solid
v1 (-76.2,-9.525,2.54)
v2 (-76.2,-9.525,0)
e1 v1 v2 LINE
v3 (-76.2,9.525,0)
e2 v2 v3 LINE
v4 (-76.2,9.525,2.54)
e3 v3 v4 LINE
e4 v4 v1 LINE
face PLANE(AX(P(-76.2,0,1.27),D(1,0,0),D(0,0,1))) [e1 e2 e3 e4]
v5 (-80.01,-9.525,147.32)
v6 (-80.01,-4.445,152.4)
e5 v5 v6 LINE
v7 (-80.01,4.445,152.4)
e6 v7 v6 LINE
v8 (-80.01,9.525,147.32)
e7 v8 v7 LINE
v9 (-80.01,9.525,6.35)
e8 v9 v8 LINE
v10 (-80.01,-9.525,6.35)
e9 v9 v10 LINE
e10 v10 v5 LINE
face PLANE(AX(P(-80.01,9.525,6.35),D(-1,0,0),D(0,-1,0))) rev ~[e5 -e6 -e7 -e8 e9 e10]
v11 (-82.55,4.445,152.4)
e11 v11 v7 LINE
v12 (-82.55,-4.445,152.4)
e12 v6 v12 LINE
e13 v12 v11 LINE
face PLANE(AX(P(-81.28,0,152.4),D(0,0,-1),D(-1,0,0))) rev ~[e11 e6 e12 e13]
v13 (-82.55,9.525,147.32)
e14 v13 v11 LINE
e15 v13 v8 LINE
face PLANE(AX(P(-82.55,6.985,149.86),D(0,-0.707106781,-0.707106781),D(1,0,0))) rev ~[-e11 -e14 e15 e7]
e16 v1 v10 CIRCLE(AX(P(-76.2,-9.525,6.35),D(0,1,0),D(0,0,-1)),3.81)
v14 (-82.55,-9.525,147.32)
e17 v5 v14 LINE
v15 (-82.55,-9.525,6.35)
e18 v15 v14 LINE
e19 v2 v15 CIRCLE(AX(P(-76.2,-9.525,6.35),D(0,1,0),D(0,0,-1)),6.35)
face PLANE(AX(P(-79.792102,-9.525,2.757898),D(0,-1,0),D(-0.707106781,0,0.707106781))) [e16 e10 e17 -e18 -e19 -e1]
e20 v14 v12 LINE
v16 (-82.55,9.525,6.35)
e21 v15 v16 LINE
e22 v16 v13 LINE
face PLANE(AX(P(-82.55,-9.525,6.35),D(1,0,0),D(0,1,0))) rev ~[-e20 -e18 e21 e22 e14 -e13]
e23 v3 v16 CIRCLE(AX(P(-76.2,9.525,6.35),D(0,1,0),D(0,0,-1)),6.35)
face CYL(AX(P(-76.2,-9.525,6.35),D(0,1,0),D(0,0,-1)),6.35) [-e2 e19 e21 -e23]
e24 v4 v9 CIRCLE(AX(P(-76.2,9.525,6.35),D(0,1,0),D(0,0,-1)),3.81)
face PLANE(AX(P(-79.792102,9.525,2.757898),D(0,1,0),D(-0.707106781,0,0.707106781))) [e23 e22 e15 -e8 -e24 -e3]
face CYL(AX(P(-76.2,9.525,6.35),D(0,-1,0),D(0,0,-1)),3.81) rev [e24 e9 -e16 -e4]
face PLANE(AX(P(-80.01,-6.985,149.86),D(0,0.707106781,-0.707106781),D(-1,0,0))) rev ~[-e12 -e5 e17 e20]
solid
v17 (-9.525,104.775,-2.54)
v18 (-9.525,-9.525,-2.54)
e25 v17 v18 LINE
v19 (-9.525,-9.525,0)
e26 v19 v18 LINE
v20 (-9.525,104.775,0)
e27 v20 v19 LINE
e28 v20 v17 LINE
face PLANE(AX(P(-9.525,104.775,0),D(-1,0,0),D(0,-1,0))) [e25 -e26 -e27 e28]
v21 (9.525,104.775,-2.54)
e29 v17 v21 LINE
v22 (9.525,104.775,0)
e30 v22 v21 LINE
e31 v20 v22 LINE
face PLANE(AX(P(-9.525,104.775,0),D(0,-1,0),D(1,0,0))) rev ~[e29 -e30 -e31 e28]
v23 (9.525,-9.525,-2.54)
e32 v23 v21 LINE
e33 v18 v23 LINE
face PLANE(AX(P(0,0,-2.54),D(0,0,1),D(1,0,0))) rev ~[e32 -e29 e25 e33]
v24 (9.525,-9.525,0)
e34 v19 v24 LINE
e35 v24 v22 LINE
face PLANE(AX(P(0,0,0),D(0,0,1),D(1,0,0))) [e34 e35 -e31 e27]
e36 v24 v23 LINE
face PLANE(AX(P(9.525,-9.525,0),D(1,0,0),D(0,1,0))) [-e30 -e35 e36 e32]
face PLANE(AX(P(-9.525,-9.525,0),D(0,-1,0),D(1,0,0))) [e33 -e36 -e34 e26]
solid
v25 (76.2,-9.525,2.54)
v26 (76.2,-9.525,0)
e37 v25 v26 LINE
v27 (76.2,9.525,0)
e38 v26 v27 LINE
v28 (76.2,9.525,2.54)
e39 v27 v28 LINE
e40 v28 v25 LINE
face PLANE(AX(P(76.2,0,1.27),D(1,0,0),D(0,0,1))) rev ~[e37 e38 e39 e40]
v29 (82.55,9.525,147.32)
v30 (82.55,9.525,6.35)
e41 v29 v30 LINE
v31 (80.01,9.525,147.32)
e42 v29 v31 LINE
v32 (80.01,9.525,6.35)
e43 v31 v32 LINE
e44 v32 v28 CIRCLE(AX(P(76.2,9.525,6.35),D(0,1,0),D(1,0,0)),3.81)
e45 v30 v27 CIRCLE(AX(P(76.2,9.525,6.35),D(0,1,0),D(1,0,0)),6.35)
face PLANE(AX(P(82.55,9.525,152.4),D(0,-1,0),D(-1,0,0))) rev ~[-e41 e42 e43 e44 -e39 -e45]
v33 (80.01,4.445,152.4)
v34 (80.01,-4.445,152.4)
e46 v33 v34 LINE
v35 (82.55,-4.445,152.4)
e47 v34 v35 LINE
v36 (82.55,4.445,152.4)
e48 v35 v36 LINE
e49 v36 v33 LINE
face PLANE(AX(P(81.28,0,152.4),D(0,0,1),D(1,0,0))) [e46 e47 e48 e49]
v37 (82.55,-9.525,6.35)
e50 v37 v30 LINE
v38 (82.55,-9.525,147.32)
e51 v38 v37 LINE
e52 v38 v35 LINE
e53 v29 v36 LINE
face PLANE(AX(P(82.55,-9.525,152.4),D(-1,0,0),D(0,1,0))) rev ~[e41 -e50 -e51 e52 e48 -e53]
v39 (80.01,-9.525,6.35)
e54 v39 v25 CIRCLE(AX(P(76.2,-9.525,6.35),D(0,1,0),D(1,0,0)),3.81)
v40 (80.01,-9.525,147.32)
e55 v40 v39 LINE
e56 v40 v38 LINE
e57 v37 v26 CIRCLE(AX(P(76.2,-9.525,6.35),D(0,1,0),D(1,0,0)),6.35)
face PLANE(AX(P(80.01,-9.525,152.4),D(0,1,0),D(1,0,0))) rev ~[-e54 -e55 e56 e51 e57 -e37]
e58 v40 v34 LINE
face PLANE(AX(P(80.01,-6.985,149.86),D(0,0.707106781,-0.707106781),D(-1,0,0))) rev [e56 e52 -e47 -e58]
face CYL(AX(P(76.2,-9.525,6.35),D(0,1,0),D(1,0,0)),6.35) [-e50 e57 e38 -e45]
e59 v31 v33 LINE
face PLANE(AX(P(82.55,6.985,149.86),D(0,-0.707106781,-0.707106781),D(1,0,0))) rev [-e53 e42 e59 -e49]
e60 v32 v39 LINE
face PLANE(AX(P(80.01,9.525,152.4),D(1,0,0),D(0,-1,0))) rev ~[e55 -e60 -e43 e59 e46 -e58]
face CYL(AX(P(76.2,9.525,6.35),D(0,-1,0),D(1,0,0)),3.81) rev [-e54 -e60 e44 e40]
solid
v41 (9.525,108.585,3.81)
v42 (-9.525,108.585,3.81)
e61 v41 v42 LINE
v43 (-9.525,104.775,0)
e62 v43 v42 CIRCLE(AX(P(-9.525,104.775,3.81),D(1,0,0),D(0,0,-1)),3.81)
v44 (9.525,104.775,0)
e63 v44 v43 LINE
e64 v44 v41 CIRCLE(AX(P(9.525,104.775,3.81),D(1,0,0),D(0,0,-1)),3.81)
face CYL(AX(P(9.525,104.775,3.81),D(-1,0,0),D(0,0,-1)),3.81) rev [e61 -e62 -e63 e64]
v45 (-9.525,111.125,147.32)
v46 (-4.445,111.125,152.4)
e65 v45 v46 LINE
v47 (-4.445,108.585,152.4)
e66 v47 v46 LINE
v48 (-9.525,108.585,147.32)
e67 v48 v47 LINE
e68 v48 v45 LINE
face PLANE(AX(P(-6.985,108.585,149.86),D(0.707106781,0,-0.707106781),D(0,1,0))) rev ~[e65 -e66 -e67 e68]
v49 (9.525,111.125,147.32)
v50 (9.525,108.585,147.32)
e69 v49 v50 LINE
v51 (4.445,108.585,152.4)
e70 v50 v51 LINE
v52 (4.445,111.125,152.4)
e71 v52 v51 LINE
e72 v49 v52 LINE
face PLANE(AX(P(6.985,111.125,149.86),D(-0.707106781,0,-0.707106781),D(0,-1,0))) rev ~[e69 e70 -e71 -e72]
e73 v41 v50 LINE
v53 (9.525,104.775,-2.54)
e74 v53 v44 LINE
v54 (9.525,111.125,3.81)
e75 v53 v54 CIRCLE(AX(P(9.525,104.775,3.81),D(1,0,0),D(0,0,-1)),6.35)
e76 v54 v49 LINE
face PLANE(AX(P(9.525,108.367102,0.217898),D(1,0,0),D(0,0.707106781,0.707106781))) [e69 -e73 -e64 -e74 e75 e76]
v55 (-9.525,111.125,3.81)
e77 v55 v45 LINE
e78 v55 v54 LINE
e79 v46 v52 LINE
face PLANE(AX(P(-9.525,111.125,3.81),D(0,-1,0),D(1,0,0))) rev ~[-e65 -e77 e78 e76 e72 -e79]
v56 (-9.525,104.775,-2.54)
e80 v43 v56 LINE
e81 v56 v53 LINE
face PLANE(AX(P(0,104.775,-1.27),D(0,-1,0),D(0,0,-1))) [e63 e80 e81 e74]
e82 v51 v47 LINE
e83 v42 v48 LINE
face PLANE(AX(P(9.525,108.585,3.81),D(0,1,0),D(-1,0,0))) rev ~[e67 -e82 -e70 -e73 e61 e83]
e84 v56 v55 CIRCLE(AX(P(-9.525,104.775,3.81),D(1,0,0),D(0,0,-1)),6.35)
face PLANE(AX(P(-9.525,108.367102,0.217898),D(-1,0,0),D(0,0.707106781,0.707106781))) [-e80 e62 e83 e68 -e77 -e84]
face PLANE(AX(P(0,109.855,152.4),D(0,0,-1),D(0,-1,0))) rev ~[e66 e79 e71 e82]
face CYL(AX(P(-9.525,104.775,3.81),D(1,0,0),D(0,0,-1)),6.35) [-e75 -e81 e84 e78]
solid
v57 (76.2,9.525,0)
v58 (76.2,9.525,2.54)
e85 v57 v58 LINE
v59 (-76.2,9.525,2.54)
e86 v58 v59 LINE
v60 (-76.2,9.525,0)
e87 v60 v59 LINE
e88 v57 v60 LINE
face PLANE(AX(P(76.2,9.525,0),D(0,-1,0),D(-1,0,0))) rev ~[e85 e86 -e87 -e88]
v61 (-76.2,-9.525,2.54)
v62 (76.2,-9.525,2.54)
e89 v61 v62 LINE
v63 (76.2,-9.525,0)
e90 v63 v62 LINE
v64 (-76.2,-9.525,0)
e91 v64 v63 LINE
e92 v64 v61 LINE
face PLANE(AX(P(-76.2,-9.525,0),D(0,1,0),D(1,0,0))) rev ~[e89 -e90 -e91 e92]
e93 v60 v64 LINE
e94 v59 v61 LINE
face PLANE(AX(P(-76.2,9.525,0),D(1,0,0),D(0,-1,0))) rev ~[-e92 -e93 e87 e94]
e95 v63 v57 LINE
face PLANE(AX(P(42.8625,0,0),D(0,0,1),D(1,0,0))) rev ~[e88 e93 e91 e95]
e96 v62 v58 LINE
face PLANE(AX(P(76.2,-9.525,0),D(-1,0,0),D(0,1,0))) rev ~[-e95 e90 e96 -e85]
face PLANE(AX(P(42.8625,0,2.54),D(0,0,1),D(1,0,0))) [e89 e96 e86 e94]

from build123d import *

# Parameters (mm, degrees)
F0_W       = 66.675
F0_H       = 19.05
F8_DEPTH   = 2.54
F0_W_2     = 19.05
F0_H_2     = 95.25
F13_DEPTH  = 2.54
F14_SIZE   = 5.08
F14_2_SIZE = 5.08
F14_3_SIZE = 5.08


with BuildPart() as f4:
    # F4: sweep along a path in F1
    with BuildLine(Plane.XZ) as f4_path:
        Line((82.55, 152.4), (82.55, 6.35))
        ThreePointArc((82.55, 6.35), (80.6901280605, 1.8598719395), (76.2, 0))
    # F3 (on offset) → F4 (sweep)
    with BuildSketch(Plane.YZ.offset(76.2)):
        Polygon((-9.525, 0), (0, 0), (9.525, 0), (9.525, 2.54), (-9.525, 2.54), align=None)
    sweep(path=f4_path.line)

    # F14
    f14_edges = [f4.edges().sort_by_distance(p)[0] for p in [
        (81.28, -9.525, 152.4),
        (81.28, 9.525, 152.4),
    ]]
    chamfer(f14_edges, length=F14_SIZE)


with BuildPart() as f7:
    # F7: sweep along a path in F1
    with BuildLine(Plane.XZ) as f7_path:
        ThreePointArc((-76.2, 0), (-80.6901280605, 1.8598719395), (-82.55, 6.35))
        Line((-82.55, 6.35), (-82.55, 152.4))
    # F6 (on offset) → F7 (sweep)
    with BuildSketch(Plane.YZ.offset(-76.2)):
        Polygon((-9.525, 0), (0, 0), (9.525, 0), (9.525, 2.54), (-9.525, 2.54), align=None)
    sweep(path=f7_path.line)

    # F14#2
    f14_2_edges = [f7.edges().sort_by_distance(p)[0] for p in [
        (-81.28, -9.525, 152.4),
        (-81.28, 9.525, 152.4),
    ]]
    chamfer(f14_2_edges, length=F14_2_SIZE)


with BuildPart() as f8:
    # F0 (on Top) → F8 (new body)
    with BuildSketch(Plane.XY):
        with Locations((42.8625, 0)):
            Rectangle(F0_W, F0_H)
        Polygon((9.525, -9.525), (9.525, 9.525), (-9.525, 9.525), (-9.525, 0), (-9.525, -9.525), align=None)
        Polygon((-9.525, 0), (-9.525, 9.525), (-76.2, 9.525), (-76.2, -9.525), (-9.525, -9.525), align=None)
    extrude(amount=F8_DEPTH)


with BuildPart() as f12:
    # F12: sweep along a path in F11
    with BuildLine(Plane.YZ) as f12_path:
        ThreePointArc((104.775, -2.54), (109.2651280605, -0.6801280605), (111.125, 3.81))
        Line((111.125, 3.81), (111.125, 152.4))
    # F10 (on offset) → F12 (sweep)
    with BuildSketch(Plane.XZ.offset(-104.775)):
        Polygon((9.525, 0), (0, 0), (-9.525, 0), (-9.525, -2.54), (9.525, -2.54), align=None)
    sweep(path=f12_path.line)

    # F14#3
    f14_3_edges = [f12.edges().sort_by_distance(p)[0] for p in [
        (9.525, 109.855, 152.4),
        (-9.525, 109.855, 152.4),
    ]]
    chamfer(f14_3_edges, length=F14_3_SIZE)


with BuildPart() as f13:
    # F0 (on Top) → F13 (new body)
    with BuildSketch(Plane.XY):
        Polygon((9.525, -9.525), (9.525, 9.525), (-9.525, 9.525), (-9.525, 0), (-9.525, -9.525), align=None)
        with Locations((0, 57.15)):
            Rectangle(F0_W_2, F0_H_2)
    extrude(amount=-F13_DEPTH)


solid = Compound([f4.part, f7.part, f8.part, f12.part, f13.part])
